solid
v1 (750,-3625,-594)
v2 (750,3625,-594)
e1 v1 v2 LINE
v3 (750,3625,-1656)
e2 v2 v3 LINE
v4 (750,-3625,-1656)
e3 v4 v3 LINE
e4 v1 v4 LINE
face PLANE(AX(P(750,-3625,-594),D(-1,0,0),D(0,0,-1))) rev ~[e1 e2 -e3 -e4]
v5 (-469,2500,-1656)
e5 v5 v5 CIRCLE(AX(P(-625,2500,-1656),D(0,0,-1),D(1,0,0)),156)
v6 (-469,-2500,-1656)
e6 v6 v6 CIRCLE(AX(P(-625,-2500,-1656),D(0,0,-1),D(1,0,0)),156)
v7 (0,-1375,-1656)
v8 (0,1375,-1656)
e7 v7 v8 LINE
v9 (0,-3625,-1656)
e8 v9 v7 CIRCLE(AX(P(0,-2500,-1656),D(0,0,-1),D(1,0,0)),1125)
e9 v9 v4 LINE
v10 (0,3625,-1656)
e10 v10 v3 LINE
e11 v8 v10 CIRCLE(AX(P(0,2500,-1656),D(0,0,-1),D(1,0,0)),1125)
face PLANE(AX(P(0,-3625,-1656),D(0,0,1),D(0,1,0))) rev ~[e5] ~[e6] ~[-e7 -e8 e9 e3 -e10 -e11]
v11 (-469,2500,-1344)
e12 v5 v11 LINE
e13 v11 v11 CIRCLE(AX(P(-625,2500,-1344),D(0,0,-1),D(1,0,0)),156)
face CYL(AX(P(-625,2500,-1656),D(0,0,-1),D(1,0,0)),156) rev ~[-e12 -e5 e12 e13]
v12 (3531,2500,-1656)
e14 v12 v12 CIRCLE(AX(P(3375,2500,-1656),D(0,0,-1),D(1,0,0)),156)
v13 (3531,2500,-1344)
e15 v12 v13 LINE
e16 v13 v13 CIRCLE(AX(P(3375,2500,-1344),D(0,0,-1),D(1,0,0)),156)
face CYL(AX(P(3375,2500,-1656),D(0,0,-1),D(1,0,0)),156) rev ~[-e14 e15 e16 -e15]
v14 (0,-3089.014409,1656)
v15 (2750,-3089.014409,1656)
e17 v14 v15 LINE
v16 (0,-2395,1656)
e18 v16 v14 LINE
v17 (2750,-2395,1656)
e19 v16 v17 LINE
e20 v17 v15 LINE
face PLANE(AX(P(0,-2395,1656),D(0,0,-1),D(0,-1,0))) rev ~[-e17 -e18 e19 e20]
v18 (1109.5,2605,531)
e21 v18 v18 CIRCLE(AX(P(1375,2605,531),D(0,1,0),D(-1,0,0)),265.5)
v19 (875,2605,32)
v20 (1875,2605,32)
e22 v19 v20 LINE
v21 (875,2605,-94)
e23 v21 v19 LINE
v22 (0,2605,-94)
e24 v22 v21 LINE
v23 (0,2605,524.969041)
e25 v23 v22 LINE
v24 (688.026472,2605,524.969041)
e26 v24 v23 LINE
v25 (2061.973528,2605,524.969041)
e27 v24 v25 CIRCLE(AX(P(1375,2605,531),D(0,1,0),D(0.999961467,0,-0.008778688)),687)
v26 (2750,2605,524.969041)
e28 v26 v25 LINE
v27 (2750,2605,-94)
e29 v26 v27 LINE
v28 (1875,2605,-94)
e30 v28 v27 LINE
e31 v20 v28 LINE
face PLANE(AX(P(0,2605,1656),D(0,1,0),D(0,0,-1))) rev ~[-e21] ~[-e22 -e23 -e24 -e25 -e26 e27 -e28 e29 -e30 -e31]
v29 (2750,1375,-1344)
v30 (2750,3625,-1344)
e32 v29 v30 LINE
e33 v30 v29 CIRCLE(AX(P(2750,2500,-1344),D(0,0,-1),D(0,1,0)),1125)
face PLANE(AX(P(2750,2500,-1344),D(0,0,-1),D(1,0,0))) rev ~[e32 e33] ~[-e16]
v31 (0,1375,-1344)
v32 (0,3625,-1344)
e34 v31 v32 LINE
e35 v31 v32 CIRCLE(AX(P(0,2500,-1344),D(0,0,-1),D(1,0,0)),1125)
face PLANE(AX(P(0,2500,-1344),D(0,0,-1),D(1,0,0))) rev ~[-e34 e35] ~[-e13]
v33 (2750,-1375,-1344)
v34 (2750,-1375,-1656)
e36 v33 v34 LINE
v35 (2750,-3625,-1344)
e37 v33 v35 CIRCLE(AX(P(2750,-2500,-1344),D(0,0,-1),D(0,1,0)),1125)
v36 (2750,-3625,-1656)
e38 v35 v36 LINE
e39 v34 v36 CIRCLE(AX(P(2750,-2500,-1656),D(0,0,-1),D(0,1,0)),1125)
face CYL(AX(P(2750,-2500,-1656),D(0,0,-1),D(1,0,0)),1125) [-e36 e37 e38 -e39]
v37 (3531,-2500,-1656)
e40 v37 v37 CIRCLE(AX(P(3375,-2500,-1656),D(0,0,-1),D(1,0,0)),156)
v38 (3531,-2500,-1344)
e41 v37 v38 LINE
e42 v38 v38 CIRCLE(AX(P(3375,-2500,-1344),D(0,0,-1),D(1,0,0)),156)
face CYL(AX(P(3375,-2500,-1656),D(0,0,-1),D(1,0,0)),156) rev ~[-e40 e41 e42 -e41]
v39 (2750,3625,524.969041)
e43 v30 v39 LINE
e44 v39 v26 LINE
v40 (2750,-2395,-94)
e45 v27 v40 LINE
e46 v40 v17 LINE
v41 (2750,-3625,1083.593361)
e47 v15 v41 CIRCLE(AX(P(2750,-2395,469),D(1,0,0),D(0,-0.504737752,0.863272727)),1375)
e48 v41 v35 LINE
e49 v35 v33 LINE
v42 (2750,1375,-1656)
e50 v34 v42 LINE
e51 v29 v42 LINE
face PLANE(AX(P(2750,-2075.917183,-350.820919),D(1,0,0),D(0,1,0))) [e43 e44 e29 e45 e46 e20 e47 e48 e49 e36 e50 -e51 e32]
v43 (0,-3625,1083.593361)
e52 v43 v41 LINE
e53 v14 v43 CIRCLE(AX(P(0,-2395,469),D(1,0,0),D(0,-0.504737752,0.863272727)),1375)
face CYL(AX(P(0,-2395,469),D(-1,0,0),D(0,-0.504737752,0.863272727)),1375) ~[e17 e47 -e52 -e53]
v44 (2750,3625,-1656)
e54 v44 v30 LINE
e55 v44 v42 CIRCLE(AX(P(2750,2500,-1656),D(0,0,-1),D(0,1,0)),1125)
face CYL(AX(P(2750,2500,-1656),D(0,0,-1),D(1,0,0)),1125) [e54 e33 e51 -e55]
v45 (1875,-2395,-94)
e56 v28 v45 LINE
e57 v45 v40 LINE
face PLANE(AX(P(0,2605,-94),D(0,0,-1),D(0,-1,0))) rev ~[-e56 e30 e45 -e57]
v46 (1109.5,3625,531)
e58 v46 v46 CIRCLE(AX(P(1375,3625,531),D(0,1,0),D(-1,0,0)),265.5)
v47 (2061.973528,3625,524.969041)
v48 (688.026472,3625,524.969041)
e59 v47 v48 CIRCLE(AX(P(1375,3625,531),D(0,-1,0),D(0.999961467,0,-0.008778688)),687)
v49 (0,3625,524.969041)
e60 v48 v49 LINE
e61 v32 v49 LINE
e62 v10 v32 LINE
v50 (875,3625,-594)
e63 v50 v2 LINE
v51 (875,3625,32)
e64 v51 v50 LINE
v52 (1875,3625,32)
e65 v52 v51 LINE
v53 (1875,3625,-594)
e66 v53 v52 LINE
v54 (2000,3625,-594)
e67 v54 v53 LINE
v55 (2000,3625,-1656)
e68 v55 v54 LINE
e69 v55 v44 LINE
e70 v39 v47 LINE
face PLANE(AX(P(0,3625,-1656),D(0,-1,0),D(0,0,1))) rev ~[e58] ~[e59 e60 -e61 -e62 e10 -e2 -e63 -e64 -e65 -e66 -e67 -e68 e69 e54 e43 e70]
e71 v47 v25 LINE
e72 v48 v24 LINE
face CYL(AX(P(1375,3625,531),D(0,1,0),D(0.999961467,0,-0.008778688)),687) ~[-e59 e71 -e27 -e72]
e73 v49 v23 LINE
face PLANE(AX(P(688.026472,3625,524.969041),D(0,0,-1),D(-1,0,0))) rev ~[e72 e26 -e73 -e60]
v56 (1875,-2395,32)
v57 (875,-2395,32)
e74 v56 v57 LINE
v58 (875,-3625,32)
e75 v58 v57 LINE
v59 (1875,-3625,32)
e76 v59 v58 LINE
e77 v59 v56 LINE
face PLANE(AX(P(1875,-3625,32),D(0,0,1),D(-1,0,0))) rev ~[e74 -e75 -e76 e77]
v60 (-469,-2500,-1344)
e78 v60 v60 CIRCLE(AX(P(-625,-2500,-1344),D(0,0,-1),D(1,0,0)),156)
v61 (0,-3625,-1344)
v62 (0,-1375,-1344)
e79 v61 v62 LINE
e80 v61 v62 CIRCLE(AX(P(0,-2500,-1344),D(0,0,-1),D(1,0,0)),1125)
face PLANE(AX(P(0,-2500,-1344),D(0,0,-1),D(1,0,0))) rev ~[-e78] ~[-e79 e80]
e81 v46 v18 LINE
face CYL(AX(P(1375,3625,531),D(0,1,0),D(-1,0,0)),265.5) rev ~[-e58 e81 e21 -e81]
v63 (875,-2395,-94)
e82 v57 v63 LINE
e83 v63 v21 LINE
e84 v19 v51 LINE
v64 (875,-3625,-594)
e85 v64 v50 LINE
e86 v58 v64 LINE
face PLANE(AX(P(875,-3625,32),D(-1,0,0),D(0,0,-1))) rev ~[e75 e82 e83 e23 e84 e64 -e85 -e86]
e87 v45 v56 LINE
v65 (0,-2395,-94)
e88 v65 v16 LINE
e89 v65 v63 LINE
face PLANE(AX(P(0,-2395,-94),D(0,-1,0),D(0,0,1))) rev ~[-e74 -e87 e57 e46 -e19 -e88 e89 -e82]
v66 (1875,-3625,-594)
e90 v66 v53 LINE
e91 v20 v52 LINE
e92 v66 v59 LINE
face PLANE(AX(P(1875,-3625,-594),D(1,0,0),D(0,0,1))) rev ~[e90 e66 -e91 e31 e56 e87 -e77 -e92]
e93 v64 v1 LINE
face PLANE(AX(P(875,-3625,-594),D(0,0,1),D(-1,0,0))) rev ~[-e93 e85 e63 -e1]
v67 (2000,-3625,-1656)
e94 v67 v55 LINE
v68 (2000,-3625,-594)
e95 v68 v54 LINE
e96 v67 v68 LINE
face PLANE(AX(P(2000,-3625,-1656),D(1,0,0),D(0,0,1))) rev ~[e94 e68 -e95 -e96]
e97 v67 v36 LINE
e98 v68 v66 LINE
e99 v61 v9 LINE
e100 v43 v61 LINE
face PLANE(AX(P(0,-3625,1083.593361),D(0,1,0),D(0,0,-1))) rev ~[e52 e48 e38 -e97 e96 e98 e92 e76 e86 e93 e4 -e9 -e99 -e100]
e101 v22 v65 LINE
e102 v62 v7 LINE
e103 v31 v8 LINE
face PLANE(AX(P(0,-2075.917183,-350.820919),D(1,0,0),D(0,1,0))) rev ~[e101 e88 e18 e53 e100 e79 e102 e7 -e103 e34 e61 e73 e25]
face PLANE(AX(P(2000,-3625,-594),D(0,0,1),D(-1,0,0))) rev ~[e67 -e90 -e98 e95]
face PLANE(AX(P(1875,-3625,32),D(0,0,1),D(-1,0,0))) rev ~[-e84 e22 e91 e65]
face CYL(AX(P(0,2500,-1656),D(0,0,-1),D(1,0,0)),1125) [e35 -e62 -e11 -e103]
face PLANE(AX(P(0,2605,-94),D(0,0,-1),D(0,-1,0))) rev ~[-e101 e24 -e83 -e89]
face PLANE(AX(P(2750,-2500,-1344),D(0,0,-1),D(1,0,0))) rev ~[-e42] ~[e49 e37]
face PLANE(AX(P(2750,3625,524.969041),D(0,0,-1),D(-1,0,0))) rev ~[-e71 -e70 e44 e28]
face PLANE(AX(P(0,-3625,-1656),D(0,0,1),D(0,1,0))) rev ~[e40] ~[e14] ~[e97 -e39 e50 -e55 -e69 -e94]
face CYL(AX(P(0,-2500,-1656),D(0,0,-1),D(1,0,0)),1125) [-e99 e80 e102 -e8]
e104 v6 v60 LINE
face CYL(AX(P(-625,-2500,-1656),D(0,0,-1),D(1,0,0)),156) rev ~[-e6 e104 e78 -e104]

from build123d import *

# Parameters (mm, degrees)
F1_DEPTH = 2750
F2_R     = 1125
F2_R_2   = 156
F3_DEPTH = 312
F5_DEPTH = 9516.50351
F6_R     = 265.5
F7_DEPTH = 2759.03485


with BuildPart() as f1:
    # F0 (on Right) → F1 (new body)
    with BuildSketch(Plane.YZ):
        with BuildLine():
            Line((-2395, 1656), (-3089.0144090723, 1656))
            ThreePointArc((-3089.0144090723, 1656), (-3398.6783356879, 1408.816364228), (-3625, 1083.5933615001))
            Line((-3625, 1083.5933615001), (-3625, -1656))
            Line((-3625, -1656), (0, -1656))
            Line((0, -1656), (0, -94))
            Line((0, -94), (-2395, -94))
            Line((-2395, -94), (-2395, 1656))
        make_face()
        Polygon((2605, -94), (0, -94), (0, -1656), (3625, -1656), (3625, 1656), (2605, 1656), align=None)
    extrude(amount=F1_DEPTH)

    # F2 (on face) → F3 (join)
    with BuildSketch(Plane(origin=(0, 0, -1656), x_dir=(1, 0, 0), z_dir=(0, 0, -1))):
        with Locations((0, 2500)):
            Circle(F2_R)
        with Locations((-625, 2500)):
            Circle(F2_R_2, mode=Mode.SUBTRACT)
        with Locations((2750, 2500)):
            Circle(F2_R)
        with Locations((3375, 2500)):
            Circle(F2_R_2, mode=Mode.SUBTRACT)
        with Locations((2750, -2500)):
            Circle(F2_R)
        with Locations((3375, -2500)):
            Circle(F2_R_2, mode=Mode.SUBTRACT)
        with Locations((0, -2500)):
            Circle(F2_R)
        with Locations((-625, -2500)):
            Circle(F2_R_2, mode=Mode.SUBTRACT)
    extrude(amount=-F3_DEPTH)

    # F4 (on face) → F5 (cut)
    with BuildSketch(Plane.XZ.offset(3625)):
        Polygon((1375, 32), (875, 32), (875, -594), (750, -594), (750, -1656), (875, -1656), (1875, -1656), (2000, -1656), (2000, -594), (1875, -594), (1875, 32), align=None)
    extrude(amount=-F5_DEPTH, mode=Mode.SUBTRACT)

    # F6 (on face) → F7 (cut)
    with BuildSketch(Plane(origin=(0, 3625, 0), x_dir=(-1, 0, 0), z_dir=(0, 1, 0))):
        with Locations((-1375, 531)):
            Circle(F6_R)
        with BuildLine():
            ThreePointArc((-2061.9735275378, 524.9690413475), (-1375, 1218), (-688.0264724622, 524.9690413475))
            Line((-688.0264724622, 524.9690413475), (0, 524.9690413475))
            Line((0, 524.9690413475), (0, 1656))
            Line((0, 1656), (-2750, 1656))
            Line((-2750, 1656), (-2750, 524.9690413475))
            Line((-2750, 524.9690413475), (-2061.9735275378, 524.9690413475))
        make_face()
    extrude(amount=-F7_DEPTH, mode=Mode.SUBTRACT)


solid = f1.part
